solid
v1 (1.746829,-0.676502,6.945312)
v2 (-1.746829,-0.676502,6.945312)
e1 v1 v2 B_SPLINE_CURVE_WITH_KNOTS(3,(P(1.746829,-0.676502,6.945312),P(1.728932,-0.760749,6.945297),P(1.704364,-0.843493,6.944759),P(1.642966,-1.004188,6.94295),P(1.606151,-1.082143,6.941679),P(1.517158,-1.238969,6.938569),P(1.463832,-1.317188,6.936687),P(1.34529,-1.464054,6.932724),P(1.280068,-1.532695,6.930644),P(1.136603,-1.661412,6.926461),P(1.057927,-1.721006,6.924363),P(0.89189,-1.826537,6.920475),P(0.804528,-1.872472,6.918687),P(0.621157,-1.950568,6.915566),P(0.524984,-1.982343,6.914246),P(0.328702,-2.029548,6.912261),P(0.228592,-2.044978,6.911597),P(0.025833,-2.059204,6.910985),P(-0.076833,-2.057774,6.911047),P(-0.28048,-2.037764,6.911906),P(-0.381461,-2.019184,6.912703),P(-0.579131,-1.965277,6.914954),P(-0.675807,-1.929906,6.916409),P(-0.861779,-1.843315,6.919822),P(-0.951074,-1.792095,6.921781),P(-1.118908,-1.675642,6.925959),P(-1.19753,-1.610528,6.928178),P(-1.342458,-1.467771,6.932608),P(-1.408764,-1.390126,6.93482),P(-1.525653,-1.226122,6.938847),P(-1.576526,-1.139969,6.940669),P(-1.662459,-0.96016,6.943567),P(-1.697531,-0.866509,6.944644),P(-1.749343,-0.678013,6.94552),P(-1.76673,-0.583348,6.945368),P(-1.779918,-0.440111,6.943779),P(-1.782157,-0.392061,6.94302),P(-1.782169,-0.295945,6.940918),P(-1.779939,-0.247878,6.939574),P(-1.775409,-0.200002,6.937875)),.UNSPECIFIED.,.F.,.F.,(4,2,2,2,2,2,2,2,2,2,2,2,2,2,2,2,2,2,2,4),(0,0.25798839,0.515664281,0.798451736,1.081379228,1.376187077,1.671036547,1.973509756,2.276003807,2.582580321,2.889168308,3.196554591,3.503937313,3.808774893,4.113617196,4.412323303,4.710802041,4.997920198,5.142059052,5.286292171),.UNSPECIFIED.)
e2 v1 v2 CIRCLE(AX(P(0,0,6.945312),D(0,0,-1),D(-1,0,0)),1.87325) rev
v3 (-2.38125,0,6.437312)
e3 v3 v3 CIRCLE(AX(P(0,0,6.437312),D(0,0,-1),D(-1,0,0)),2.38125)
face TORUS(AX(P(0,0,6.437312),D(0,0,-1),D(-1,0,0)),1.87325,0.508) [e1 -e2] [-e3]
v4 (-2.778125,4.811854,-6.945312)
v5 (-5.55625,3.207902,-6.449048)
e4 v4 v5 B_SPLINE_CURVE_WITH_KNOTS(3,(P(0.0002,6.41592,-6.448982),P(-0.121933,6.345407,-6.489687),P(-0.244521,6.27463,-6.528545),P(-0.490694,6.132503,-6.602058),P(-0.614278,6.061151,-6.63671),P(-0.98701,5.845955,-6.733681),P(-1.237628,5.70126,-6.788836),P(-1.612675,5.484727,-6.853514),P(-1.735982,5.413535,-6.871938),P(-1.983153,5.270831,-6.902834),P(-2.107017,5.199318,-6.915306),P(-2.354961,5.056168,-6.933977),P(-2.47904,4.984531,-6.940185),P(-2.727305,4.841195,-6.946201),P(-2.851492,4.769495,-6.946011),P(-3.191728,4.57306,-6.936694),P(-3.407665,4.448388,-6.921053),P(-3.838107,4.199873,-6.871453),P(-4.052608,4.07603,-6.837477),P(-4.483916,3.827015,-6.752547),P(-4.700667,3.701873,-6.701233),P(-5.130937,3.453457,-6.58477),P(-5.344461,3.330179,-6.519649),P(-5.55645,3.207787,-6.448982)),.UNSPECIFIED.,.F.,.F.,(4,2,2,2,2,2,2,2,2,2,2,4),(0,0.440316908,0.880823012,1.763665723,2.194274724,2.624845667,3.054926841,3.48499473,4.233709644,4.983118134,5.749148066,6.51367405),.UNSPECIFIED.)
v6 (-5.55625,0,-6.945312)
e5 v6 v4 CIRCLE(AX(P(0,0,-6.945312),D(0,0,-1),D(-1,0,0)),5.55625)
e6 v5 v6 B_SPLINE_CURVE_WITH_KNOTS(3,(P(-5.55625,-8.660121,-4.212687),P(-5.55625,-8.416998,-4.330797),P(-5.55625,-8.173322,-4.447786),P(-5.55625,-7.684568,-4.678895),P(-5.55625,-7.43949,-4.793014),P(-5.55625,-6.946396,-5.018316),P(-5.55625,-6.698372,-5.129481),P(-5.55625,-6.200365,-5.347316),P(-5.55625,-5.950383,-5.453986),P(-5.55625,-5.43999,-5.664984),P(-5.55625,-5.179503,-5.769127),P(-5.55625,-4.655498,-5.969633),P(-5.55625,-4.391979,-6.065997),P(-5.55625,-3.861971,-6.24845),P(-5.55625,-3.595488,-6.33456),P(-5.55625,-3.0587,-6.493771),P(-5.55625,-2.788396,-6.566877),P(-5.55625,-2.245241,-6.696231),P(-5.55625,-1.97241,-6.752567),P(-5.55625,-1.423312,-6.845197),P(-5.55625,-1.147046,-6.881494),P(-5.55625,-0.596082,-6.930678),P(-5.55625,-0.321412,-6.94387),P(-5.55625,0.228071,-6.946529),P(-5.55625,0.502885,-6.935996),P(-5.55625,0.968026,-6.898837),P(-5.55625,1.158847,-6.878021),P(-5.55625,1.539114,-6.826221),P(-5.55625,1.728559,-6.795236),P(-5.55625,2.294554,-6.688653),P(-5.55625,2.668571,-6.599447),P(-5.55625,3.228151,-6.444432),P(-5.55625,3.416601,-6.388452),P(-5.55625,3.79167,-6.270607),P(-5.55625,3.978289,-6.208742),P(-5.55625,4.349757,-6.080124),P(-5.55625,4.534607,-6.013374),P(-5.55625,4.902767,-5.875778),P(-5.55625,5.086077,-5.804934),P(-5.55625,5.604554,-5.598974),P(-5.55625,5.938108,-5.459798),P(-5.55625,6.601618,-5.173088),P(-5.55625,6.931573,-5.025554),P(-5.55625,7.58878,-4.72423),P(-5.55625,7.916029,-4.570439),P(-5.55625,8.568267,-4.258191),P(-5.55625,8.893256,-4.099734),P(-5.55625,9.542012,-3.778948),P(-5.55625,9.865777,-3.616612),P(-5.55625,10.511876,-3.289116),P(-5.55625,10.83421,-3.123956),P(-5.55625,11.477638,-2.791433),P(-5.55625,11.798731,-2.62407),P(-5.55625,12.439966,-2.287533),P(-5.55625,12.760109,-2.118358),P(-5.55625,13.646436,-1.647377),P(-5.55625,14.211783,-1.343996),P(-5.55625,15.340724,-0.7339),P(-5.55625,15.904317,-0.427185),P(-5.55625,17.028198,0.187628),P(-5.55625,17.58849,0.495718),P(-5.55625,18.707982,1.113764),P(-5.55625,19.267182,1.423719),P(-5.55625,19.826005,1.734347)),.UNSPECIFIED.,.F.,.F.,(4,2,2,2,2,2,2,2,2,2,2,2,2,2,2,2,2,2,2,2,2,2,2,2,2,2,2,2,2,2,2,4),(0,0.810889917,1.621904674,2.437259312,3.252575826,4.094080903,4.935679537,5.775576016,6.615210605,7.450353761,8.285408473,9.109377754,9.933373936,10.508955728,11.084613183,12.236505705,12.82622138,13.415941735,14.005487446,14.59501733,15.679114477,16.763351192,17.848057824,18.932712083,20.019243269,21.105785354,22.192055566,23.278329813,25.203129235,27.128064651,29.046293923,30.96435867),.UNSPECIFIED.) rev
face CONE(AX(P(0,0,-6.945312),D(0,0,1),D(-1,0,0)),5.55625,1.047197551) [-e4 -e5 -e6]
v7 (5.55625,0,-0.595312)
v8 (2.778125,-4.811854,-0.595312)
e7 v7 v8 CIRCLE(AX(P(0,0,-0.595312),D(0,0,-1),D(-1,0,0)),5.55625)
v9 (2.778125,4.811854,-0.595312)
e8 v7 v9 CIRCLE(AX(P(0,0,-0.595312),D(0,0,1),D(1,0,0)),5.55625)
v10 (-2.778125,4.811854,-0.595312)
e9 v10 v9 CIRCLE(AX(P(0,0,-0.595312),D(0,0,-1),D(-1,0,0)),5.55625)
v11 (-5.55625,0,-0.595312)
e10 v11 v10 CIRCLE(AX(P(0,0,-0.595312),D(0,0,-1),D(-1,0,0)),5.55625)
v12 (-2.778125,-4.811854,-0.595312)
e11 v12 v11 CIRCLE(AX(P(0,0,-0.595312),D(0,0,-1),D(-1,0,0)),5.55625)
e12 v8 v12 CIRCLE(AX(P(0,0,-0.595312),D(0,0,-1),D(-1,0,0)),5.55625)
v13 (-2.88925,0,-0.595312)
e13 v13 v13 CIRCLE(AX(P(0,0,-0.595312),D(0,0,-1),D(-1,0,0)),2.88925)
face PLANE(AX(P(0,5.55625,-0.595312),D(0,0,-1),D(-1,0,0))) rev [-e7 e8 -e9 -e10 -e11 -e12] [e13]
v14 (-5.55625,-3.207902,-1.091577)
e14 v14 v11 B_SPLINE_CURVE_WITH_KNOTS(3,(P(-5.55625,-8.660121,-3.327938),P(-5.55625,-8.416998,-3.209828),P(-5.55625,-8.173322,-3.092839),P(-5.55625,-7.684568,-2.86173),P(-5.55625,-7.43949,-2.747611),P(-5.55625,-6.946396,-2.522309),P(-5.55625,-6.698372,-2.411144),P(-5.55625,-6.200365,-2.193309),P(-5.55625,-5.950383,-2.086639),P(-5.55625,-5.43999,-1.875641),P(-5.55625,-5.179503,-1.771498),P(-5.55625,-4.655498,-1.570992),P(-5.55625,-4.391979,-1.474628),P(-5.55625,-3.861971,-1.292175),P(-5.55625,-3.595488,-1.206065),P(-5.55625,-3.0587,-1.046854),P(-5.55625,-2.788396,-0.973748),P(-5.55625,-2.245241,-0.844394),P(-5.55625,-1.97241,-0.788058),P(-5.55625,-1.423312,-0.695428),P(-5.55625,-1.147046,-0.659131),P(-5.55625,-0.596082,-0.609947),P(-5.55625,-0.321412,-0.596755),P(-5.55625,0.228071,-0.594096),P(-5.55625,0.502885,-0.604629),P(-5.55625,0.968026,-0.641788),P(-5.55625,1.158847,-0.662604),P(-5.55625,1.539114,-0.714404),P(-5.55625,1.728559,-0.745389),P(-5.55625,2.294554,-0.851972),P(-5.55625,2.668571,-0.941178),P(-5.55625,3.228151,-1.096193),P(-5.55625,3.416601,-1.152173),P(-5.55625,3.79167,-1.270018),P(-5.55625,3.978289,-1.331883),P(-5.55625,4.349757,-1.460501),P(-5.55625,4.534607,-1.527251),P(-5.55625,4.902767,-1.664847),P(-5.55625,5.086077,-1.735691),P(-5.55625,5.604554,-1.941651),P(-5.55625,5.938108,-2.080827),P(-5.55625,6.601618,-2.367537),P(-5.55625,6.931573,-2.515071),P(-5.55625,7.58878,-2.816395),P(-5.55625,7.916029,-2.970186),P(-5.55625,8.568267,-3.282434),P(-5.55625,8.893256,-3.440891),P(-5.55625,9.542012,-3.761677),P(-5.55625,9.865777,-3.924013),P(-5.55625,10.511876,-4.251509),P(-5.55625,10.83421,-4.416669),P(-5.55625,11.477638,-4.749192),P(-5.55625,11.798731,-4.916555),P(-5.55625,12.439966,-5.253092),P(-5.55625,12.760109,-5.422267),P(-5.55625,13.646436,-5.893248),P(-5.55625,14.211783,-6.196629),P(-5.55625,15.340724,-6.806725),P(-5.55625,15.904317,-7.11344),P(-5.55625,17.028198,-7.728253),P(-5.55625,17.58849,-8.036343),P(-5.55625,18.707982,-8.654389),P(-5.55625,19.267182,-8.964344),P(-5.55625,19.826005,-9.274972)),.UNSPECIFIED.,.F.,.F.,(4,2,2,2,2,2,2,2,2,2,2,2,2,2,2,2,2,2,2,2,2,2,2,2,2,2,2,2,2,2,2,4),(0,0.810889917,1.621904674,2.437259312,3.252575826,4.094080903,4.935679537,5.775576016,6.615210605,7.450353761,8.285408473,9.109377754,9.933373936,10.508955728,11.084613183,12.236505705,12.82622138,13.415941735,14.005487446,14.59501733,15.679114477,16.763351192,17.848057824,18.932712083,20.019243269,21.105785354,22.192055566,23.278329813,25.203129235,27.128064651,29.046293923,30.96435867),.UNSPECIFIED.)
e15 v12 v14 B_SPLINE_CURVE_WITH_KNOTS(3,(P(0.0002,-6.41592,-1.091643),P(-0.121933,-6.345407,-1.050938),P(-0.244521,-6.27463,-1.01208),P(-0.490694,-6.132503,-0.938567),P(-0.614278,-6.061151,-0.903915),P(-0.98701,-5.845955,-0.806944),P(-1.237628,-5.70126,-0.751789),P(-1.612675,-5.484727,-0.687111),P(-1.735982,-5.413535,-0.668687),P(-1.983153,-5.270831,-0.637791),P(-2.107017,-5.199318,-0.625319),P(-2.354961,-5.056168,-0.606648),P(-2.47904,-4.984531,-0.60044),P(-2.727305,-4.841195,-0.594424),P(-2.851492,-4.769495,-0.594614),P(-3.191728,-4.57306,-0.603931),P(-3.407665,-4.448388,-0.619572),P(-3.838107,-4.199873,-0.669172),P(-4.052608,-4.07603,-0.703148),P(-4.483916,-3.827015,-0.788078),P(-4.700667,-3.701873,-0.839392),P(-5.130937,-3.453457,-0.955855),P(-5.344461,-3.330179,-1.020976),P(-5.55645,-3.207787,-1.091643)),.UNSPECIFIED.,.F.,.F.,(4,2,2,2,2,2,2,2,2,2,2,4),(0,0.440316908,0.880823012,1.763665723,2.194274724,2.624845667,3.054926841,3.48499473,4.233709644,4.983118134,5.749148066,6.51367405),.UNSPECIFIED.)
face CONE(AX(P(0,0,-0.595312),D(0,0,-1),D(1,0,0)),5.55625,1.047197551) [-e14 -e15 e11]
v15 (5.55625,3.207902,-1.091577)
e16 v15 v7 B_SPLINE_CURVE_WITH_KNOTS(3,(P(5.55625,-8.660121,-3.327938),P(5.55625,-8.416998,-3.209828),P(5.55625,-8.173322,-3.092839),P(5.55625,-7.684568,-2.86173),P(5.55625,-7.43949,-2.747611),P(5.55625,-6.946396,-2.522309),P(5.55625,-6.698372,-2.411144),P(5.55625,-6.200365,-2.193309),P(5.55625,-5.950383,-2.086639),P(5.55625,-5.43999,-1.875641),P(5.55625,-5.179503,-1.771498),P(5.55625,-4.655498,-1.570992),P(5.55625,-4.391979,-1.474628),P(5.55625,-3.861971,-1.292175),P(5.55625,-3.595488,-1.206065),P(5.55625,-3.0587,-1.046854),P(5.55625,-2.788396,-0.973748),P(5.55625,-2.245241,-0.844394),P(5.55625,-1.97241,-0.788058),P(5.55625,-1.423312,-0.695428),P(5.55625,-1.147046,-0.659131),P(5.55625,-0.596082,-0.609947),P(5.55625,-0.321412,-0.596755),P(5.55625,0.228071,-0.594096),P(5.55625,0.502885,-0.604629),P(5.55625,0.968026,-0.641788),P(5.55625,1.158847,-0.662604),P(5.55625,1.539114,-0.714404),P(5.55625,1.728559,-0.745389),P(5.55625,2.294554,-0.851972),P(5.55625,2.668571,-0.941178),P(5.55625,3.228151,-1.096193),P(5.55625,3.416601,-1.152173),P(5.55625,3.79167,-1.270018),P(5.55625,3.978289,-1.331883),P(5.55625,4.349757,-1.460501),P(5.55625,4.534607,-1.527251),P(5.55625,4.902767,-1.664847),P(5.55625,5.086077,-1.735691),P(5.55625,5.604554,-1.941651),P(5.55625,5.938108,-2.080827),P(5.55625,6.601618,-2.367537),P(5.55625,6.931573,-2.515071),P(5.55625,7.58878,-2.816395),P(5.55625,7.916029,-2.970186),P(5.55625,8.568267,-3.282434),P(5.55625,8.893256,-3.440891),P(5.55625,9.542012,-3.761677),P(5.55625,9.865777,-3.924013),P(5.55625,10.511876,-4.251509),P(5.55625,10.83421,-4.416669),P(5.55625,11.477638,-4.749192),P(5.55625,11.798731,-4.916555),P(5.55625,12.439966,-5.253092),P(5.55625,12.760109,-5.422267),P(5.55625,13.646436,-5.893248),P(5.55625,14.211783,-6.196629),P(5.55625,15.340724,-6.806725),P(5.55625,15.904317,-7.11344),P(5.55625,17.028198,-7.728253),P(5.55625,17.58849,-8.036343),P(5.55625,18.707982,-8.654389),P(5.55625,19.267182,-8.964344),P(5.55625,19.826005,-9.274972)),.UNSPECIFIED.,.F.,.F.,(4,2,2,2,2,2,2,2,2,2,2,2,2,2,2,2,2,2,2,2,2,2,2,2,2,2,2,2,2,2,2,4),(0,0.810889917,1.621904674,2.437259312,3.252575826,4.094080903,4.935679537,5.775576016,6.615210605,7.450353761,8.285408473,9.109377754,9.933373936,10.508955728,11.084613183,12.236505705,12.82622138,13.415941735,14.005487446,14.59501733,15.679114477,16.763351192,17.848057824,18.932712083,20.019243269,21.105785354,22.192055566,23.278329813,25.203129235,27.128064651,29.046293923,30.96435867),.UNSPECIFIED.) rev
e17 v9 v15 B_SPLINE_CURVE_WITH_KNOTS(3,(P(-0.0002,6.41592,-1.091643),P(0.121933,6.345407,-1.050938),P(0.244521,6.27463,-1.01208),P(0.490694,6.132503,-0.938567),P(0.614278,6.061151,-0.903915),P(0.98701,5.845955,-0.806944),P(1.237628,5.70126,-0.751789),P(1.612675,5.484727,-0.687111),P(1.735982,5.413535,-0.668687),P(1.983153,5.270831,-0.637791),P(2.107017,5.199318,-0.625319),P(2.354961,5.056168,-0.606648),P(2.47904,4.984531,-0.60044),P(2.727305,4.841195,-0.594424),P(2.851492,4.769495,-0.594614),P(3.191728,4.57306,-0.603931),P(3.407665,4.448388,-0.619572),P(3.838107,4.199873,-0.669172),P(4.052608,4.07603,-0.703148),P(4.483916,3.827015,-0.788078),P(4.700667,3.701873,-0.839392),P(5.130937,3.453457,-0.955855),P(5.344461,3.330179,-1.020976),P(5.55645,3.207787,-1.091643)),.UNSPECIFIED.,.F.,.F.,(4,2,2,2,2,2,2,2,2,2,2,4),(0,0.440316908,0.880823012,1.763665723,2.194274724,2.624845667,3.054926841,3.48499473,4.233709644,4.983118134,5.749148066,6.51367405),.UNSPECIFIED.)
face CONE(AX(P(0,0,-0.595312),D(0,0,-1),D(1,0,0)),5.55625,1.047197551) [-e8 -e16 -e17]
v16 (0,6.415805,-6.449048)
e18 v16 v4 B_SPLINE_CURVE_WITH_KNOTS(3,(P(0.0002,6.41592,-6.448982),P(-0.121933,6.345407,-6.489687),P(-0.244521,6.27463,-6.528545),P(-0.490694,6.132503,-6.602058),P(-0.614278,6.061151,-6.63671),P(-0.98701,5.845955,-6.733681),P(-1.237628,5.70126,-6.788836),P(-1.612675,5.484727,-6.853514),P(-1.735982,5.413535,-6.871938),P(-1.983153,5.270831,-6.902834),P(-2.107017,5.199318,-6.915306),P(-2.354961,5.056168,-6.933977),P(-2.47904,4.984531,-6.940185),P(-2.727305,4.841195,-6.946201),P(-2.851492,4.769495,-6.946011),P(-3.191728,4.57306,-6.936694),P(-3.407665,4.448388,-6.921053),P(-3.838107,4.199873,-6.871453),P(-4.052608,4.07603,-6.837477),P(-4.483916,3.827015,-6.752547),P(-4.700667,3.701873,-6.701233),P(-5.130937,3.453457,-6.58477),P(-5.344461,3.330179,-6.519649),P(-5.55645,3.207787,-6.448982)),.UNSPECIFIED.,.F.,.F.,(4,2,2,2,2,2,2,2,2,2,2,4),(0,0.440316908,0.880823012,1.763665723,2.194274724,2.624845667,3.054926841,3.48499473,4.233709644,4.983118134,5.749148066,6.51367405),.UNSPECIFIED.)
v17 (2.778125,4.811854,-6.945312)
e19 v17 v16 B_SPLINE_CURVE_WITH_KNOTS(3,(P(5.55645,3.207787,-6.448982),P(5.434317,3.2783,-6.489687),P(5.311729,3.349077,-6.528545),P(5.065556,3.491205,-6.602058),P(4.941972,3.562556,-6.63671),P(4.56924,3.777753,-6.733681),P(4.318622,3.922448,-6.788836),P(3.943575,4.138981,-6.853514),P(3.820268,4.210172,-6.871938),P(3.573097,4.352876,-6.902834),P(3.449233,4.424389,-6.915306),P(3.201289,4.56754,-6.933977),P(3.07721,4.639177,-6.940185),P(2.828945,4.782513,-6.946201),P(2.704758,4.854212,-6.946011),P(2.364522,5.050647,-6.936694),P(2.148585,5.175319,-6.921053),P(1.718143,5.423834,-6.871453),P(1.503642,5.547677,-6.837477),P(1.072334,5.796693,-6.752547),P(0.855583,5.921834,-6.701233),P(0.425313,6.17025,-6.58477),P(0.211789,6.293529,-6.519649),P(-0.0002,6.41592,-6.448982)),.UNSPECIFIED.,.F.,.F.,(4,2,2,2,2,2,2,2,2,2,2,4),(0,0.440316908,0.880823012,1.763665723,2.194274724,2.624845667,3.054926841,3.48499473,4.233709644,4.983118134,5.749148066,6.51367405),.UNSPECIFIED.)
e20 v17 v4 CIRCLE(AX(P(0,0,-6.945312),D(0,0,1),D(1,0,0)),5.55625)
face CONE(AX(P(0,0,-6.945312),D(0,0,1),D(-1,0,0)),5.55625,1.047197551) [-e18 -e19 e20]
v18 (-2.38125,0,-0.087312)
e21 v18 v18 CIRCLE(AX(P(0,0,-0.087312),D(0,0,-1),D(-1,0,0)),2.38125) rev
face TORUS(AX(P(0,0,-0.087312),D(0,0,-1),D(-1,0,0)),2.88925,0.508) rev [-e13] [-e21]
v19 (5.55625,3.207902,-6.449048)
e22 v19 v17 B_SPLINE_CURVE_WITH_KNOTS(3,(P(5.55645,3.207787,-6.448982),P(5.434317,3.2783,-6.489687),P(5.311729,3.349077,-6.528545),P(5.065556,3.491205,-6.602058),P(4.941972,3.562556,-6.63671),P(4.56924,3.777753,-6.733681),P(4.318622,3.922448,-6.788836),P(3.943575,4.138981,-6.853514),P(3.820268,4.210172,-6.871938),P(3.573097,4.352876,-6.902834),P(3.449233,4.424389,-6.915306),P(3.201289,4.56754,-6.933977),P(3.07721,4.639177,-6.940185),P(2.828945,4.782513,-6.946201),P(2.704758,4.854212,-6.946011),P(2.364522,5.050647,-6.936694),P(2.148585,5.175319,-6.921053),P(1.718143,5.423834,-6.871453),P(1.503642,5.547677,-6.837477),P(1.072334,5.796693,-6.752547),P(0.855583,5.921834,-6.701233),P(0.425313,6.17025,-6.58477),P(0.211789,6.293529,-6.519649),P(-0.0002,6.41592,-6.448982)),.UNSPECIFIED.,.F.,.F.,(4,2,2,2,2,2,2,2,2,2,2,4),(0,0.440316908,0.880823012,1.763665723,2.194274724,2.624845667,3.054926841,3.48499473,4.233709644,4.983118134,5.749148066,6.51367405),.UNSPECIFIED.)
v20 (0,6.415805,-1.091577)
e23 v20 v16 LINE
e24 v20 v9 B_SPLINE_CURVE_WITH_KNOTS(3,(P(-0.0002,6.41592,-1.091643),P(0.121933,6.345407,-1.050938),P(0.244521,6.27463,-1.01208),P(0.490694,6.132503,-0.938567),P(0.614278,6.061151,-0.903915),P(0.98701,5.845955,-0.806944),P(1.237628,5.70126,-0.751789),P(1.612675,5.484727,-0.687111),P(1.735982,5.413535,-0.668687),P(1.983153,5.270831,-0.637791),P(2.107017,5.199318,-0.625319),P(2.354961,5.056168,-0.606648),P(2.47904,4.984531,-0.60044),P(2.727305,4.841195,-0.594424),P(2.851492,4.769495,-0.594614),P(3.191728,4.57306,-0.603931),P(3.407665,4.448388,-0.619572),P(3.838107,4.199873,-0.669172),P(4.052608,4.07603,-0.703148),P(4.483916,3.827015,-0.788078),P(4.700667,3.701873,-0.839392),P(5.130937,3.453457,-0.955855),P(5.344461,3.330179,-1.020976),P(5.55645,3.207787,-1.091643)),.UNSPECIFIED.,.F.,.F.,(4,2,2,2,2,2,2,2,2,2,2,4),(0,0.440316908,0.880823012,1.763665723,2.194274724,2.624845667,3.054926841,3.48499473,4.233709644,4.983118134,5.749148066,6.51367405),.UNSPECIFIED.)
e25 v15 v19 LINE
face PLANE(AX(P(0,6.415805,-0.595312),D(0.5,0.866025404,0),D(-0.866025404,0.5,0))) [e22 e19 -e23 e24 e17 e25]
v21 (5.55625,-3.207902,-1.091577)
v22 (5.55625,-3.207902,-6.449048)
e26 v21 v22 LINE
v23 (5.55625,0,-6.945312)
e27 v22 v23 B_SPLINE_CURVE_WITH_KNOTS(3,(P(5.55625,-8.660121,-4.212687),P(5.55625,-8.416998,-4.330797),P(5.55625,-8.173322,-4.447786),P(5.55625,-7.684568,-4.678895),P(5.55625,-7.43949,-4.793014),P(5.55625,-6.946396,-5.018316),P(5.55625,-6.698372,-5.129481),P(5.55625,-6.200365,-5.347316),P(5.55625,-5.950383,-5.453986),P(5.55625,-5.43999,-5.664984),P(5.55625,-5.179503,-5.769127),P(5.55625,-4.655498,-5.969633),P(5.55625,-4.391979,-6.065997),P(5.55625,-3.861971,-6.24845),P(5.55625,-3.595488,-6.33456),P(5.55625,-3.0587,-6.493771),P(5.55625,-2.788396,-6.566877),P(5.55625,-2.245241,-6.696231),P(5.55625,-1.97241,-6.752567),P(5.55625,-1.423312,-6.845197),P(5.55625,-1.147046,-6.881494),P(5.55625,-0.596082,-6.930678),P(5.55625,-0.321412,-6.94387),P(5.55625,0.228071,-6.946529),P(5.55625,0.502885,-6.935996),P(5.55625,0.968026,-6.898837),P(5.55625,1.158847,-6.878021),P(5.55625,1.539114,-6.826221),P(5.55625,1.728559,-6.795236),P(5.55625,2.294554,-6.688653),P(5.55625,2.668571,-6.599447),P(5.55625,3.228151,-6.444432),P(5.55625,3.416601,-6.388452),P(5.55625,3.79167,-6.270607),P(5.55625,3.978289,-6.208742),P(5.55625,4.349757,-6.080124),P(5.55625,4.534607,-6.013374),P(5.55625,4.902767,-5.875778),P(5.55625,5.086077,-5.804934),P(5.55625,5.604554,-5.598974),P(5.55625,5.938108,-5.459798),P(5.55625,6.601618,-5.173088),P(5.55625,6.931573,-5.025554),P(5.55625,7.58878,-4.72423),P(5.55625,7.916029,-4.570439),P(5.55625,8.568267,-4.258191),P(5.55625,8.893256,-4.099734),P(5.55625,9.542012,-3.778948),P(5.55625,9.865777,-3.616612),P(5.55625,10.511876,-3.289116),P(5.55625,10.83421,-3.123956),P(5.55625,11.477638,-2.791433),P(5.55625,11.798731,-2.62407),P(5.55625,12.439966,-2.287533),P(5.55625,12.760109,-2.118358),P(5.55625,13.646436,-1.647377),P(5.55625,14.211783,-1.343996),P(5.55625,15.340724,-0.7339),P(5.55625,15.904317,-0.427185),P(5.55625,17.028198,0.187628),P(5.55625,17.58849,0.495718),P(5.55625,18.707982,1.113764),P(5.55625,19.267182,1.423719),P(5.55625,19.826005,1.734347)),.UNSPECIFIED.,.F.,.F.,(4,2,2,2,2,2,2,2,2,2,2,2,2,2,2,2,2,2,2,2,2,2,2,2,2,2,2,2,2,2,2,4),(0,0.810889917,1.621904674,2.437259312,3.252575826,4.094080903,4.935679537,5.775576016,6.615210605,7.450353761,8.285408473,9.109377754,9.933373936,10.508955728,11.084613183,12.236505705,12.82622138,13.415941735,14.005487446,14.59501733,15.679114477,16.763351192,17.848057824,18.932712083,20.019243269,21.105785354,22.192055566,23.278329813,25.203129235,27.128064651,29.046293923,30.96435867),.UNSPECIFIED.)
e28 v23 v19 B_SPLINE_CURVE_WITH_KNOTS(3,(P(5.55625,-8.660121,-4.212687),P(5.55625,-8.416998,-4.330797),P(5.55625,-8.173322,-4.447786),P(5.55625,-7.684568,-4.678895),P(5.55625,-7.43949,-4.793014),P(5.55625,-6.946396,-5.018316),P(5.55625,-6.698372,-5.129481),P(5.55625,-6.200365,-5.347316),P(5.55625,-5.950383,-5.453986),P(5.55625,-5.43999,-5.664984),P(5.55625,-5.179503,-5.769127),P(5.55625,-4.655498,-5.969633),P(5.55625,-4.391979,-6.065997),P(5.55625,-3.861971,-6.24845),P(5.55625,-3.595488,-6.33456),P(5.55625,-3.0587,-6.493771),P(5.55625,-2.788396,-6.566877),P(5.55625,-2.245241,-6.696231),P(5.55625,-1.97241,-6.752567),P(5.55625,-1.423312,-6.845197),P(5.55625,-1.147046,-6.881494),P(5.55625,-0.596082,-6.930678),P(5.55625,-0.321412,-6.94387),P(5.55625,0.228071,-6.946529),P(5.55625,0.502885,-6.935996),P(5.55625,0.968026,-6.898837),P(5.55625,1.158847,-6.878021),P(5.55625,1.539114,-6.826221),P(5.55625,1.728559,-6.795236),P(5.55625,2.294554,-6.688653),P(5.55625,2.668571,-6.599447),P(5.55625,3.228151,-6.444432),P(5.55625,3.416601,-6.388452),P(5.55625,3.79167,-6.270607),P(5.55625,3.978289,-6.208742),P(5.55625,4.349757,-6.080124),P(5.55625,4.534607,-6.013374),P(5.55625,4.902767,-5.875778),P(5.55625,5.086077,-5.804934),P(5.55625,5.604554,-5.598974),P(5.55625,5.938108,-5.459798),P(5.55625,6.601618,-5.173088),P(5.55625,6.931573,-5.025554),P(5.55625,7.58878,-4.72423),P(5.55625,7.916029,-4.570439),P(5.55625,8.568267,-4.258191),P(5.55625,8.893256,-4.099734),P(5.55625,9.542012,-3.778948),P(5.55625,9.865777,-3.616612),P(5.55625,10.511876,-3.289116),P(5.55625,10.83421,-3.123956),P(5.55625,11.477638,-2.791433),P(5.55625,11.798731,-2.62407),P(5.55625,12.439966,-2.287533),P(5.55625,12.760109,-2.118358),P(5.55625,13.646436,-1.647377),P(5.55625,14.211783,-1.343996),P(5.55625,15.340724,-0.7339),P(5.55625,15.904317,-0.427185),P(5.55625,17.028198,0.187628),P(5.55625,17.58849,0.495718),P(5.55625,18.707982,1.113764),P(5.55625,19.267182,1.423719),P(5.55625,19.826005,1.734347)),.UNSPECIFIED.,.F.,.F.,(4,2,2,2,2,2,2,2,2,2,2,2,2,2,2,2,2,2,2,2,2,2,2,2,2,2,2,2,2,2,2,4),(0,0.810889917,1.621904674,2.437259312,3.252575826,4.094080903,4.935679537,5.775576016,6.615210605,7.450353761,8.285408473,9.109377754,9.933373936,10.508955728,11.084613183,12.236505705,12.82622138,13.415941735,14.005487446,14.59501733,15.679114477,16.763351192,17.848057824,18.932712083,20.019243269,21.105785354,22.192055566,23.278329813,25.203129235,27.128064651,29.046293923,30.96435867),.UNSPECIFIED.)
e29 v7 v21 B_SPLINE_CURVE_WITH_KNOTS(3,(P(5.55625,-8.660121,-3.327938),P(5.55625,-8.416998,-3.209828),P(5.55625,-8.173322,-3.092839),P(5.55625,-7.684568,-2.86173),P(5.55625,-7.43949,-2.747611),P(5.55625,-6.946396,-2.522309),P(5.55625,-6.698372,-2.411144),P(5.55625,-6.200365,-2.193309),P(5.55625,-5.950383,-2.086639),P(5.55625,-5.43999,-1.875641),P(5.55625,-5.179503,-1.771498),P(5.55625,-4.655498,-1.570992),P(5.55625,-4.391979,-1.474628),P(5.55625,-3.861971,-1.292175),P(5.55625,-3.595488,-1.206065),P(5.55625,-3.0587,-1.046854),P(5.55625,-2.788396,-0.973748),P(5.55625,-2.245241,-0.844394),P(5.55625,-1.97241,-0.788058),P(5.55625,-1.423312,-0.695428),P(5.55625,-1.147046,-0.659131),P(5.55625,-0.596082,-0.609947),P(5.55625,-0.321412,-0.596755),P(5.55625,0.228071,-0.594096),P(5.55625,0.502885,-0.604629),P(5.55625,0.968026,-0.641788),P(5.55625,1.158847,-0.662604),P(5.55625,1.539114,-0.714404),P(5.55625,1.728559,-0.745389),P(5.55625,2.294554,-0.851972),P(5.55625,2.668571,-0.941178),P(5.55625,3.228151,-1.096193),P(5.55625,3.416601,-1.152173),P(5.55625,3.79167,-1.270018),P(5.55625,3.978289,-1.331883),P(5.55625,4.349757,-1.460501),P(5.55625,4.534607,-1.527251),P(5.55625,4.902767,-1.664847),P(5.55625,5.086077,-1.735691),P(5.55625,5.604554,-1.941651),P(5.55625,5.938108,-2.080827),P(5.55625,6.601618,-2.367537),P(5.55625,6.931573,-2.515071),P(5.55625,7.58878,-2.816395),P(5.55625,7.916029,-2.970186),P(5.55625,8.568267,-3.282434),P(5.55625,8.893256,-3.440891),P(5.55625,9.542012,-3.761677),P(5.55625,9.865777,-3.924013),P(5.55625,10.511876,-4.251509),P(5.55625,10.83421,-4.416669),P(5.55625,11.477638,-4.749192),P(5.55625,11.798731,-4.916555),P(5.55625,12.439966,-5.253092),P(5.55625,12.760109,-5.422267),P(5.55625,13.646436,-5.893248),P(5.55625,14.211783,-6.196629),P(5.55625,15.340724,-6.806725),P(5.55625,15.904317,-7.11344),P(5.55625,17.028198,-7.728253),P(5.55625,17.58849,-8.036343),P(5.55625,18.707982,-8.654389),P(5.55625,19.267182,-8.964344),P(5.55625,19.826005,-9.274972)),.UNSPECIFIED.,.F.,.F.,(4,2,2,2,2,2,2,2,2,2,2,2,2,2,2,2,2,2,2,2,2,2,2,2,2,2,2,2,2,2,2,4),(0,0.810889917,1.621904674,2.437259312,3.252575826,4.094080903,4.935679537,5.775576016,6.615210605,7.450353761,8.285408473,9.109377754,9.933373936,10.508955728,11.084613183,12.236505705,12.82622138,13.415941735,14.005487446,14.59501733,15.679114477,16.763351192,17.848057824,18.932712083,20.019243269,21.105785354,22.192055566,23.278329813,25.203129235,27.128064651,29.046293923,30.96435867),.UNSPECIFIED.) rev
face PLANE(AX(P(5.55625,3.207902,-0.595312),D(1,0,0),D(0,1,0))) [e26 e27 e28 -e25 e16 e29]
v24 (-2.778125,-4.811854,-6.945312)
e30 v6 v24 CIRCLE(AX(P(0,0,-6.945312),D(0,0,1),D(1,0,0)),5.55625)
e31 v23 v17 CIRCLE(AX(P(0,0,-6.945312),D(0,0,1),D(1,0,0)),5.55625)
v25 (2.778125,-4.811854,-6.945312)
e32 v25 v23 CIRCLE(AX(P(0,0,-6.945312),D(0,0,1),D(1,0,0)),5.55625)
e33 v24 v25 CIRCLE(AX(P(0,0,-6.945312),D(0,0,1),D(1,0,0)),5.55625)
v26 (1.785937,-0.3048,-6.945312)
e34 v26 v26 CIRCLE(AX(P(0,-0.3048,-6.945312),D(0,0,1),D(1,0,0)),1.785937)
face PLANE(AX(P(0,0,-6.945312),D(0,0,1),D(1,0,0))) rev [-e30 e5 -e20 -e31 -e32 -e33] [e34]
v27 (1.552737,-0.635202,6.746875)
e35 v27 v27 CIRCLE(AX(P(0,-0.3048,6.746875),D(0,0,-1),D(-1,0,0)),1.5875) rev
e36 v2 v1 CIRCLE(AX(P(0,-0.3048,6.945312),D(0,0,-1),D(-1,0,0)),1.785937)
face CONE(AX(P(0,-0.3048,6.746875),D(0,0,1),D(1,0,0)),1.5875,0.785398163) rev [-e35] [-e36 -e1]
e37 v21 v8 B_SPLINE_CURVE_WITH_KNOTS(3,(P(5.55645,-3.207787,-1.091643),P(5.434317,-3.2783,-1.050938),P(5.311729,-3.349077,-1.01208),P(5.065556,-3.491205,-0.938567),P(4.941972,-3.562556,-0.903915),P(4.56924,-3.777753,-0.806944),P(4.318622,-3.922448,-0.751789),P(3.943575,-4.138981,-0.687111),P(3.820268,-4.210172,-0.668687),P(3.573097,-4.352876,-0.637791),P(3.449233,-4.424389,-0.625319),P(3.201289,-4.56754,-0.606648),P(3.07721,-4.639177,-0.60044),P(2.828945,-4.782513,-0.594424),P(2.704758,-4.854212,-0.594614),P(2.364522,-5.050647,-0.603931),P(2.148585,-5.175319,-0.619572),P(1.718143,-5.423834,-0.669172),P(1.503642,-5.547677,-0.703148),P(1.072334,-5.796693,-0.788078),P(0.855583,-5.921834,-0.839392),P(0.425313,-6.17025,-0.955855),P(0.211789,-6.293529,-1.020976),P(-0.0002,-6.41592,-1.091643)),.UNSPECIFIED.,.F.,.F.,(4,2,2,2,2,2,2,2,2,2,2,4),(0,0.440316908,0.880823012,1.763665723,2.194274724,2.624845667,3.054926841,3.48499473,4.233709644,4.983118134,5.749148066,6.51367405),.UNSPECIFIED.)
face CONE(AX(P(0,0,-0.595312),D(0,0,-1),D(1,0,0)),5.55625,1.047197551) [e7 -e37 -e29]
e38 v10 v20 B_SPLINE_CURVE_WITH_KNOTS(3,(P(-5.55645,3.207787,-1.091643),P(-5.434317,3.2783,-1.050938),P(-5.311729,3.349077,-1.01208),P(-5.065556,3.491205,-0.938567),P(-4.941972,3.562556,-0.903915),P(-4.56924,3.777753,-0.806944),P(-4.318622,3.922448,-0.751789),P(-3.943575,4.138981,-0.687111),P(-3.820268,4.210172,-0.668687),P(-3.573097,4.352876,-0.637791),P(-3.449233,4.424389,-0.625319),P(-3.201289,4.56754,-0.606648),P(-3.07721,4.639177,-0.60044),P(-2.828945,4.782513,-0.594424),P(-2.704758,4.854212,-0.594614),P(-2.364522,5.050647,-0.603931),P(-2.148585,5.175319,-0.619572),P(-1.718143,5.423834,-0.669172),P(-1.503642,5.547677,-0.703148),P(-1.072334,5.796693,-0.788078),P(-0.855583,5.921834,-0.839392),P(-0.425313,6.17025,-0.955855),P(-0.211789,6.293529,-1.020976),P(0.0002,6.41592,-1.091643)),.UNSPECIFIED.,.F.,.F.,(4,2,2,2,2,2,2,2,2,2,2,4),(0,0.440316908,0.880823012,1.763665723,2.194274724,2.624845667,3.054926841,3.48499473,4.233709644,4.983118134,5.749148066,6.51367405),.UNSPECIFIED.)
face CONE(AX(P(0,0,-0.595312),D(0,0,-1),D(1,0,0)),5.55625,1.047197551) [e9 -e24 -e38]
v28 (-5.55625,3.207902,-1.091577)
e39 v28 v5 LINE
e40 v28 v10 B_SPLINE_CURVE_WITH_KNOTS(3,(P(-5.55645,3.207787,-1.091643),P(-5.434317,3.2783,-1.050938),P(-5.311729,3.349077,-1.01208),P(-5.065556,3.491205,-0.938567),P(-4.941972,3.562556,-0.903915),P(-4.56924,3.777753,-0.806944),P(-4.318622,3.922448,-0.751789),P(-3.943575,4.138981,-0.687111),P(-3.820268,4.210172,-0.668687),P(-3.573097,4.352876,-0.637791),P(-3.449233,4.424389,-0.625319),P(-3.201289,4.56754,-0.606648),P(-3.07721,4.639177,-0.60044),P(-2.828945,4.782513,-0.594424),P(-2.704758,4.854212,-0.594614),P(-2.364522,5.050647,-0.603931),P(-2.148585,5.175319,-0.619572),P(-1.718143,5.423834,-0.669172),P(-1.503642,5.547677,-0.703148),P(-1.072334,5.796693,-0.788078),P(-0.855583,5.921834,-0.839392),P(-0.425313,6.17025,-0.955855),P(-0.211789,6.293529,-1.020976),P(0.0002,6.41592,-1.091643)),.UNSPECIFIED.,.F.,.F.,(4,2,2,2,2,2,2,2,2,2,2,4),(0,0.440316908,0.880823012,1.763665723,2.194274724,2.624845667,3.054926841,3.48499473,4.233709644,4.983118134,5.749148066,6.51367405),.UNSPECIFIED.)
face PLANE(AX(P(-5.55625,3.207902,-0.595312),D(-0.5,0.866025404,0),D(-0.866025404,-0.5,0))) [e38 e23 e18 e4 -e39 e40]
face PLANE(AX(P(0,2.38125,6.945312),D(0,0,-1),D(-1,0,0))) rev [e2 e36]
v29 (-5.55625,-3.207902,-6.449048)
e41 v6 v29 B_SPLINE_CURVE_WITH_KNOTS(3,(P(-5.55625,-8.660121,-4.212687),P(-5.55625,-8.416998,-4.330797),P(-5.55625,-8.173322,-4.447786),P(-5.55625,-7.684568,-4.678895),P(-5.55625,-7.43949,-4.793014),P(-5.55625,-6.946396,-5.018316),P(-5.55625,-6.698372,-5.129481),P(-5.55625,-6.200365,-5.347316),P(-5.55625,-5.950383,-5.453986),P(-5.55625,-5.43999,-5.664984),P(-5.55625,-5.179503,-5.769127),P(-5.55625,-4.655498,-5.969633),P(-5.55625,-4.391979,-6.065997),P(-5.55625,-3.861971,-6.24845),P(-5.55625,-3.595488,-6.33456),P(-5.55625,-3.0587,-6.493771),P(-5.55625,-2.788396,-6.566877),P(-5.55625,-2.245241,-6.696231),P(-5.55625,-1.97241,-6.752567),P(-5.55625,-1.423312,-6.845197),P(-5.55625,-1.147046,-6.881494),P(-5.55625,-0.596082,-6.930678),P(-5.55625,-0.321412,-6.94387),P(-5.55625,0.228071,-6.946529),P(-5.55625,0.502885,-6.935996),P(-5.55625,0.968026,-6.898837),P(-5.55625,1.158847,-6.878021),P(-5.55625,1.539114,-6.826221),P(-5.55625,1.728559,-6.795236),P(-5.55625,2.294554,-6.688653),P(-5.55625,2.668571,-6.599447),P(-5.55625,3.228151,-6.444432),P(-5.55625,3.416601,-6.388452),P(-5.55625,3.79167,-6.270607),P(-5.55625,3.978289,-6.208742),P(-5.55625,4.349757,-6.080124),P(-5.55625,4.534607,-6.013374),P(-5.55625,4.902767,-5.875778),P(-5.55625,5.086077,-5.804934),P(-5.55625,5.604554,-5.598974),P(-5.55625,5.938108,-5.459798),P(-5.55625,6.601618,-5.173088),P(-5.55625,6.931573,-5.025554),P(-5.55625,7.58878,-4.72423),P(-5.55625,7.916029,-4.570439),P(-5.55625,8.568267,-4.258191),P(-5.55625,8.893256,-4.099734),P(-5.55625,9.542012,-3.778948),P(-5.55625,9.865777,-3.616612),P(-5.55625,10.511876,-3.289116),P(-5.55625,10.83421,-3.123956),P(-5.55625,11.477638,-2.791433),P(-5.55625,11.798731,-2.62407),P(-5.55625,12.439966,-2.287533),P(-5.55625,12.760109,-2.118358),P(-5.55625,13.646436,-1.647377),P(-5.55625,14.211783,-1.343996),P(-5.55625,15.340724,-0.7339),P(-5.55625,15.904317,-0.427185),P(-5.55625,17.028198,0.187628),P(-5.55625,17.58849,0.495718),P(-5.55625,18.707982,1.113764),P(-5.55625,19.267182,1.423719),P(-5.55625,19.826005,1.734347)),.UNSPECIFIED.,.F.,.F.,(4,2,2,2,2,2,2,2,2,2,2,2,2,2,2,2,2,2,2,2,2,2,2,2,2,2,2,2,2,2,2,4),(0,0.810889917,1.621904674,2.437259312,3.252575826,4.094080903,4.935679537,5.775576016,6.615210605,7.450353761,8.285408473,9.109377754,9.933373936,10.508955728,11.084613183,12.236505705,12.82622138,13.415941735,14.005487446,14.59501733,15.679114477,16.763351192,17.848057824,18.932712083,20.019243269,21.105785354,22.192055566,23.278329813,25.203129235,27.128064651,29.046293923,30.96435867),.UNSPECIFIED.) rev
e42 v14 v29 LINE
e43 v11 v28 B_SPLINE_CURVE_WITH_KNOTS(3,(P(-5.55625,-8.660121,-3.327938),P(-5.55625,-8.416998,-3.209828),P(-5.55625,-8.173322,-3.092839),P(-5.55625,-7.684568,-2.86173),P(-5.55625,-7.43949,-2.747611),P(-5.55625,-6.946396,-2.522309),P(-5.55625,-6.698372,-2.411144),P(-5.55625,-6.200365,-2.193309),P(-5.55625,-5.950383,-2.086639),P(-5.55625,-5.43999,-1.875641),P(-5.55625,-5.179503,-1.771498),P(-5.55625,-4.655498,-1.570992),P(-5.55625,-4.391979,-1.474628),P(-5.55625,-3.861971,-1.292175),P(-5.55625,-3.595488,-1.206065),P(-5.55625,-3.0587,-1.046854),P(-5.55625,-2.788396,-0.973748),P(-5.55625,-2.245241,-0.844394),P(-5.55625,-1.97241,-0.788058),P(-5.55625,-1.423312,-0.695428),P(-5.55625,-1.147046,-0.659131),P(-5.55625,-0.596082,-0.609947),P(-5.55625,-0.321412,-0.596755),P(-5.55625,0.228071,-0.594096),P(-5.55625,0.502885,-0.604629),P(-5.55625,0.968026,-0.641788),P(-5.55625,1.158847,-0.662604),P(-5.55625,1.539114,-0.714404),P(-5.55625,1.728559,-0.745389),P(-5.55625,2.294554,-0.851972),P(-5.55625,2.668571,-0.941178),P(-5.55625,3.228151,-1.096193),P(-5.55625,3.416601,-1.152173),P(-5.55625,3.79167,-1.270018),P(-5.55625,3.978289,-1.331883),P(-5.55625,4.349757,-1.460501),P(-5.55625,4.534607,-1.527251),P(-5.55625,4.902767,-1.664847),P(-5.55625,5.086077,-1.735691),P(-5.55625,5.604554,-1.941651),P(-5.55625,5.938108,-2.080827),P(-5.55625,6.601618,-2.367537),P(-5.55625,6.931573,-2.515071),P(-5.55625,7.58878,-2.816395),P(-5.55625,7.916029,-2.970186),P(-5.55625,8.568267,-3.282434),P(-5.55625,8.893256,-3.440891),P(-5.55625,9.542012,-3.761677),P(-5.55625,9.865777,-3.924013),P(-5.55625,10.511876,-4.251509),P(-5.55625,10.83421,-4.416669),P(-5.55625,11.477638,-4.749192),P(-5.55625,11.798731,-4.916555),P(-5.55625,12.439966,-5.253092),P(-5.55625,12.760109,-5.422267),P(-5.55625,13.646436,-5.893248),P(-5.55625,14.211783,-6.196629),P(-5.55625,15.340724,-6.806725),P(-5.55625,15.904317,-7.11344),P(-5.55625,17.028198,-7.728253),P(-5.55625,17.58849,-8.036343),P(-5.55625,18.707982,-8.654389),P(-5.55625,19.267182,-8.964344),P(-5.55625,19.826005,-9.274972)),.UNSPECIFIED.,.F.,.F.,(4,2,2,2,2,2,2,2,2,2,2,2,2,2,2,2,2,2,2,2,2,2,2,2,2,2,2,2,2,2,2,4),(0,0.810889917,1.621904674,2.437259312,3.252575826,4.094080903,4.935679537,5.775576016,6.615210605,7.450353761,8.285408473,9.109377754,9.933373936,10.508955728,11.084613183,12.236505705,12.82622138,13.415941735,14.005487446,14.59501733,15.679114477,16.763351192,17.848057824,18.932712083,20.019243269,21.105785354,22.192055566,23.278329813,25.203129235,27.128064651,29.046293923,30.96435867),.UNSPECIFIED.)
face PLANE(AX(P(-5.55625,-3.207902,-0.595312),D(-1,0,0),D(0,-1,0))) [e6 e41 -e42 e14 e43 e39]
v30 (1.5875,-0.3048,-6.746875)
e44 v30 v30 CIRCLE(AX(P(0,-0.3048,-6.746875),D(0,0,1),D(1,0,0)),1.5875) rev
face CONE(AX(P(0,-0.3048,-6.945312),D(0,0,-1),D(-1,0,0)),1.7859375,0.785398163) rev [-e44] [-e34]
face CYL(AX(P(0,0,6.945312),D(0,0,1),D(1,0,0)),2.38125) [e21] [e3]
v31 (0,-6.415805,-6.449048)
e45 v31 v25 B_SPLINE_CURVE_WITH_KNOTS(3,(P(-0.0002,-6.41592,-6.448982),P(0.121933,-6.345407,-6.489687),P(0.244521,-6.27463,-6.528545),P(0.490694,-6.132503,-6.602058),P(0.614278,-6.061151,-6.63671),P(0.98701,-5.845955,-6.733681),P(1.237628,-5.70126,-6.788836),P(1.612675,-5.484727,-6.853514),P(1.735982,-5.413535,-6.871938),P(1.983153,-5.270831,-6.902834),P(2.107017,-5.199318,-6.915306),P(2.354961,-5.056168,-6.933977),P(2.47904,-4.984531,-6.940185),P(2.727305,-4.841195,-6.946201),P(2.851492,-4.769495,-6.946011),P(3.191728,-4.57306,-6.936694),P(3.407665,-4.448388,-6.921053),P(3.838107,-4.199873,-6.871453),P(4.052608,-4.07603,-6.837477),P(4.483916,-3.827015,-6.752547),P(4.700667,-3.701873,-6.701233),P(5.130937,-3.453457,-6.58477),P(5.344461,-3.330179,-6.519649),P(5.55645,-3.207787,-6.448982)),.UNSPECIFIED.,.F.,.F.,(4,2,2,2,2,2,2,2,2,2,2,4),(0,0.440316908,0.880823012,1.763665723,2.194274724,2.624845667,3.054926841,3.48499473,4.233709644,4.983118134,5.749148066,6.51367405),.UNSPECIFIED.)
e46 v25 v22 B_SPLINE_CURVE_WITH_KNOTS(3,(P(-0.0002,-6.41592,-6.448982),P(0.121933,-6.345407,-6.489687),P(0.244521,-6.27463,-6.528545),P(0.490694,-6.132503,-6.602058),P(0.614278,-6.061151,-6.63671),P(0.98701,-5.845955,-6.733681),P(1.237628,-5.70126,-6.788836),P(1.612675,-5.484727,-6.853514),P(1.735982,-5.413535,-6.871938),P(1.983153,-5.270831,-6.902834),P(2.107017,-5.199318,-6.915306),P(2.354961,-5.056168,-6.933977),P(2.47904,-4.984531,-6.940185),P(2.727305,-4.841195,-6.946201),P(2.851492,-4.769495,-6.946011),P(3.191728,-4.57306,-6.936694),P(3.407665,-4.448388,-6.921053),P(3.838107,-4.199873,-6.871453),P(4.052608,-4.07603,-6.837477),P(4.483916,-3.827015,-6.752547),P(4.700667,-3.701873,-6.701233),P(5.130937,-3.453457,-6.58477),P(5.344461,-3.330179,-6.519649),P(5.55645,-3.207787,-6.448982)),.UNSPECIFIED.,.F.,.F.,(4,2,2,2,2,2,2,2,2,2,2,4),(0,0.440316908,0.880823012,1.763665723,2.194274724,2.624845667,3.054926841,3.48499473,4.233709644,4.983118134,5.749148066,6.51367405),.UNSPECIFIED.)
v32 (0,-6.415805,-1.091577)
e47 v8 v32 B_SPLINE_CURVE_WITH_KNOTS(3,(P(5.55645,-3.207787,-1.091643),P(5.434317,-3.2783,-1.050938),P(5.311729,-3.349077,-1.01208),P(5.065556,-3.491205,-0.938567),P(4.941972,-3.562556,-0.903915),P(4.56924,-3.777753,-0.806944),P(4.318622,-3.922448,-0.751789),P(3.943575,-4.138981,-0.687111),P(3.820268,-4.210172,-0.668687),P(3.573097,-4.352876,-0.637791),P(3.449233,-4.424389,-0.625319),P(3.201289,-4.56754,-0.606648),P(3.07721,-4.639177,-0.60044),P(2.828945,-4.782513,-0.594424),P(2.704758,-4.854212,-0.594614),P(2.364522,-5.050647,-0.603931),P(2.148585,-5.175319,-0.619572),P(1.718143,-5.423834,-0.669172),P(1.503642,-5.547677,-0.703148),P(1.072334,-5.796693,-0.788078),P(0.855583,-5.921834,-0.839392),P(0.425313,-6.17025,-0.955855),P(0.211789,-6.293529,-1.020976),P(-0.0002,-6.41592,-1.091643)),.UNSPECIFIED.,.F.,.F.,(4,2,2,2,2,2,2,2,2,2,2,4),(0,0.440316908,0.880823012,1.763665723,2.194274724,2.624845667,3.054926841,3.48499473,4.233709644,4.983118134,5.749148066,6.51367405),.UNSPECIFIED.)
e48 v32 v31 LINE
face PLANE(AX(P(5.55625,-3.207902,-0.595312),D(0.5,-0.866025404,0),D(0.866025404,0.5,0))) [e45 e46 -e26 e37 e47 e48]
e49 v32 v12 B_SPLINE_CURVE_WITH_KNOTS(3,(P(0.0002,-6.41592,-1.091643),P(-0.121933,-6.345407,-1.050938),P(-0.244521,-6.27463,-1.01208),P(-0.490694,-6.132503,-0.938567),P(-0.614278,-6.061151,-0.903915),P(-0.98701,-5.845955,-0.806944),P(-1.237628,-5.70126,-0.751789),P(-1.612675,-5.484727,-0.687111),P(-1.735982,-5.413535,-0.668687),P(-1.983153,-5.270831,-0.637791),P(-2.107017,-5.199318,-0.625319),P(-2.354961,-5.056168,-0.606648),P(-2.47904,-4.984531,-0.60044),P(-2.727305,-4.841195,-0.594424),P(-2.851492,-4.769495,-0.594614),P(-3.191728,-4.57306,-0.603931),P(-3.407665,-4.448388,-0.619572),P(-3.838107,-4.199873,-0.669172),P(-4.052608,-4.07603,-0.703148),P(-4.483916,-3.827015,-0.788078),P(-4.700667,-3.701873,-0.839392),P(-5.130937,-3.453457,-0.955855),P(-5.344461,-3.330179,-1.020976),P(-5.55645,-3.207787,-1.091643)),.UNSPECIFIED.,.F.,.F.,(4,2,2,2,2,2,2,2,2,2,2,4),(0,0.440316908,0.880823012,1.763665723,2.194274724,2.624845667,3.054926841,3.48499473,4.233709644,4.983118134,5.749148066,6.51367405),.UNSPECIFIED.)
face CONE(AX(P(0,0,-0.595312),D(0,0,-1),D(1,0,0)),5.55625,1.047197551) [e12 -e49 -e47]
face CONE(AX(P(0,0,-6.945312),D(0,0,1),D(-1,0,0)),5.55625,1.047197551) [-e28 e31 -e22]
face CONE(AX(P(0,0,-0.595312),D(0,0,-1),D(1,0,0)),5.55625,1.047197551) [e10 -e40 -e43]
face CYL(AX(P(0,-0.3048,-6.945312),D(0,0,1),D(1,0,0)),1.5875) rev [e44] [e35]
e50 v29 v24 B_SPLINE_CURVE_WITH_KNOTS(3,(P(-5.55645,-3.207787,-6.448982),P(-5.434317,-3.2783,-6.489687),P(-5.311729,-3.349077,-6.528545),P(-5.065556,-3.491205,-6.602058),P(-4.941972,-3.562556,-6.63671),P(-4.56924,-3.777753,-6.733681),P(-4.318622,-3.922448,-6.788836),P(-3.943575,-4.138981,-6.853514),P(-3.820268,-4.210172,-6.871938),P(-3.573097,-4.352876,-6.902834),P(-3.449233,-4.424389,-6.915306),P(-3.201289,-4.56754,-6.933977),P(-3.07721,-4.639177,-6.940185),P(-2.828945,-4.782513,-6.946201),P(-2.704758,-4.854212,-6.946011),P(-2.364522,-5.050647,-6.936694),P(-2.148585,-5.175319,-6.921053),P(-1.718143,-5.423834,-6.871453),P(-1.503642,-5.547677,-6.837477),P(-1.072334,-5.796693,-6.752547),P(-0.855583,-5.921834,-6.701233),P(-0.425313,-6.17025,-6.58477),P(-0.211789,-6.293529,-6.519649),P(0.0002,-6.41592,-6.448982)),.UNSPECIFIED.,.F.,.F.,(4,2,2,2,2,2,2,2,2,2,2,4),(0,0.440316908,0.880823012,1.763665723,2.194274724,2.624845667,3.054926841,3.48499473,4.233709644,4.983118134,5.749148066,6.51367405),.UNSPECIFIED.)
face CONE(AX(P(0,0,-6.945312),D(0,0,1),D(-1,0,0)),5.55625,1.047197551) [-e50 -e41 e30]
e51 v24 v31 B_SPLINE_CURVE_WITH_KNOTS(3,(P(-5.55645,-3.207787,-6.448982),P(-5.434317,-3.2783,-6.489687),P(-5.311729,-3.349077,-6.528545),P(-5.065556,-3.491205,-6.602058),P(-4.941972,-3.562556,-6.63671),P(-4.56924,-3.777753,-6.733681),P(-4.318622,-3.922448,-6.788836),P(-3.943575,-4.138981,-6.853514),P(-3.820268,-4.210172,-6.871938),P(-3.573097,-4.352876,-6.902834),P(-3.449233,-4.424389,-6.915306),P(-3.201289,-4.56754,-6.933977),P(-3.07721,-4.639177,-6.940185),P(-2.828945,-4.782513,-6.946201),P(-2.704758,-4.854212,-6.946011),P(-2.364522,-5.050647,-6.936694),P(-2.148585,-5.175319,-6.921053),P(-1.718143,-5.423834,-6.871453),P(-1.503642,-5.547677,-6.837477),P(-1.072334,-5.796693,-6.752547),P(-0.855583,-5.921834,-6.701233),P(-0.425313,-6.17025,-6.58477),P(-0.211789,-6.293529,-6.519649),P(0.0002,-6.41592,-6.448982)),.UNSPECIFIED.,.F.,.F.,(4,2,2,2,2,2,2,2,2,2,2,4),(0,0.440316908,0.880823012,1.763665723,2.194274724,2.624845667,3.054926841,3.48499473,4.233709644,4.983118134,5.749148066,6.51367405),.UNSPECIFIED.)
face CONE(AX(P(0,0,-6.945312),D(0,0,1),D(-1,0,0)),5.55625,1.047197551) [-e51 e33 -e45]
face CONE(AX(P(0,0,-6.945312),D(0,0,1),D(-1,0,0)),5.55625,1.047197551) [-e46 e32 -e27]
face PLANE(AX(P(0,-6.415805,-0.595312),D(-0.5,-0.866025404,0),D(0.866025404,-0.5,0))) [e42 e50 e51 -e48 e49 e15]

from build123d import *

# Parameters (mm, degrees)
HEX_EXTRUDE_DEPTH        = 6.35
SKETCH4_OUTSIDE_W        = 77.352
SKETCH4_OUTSIDE_H        = 79.072
SKETCH4_OUTSIDE_R        = 5.55625
HEX_CUT1_DEPTH           = 17.278326973
HEX_CUT1_DRAFT           = -60
SKETCH5_OUTSIDE_W        = 60.292
SKETCH5_OUTSIDE_H        = 62.012
SKETCH5_OUTSIDE_R        = 5.55625
HEX_CUT2_DEPTH           = 12.353215031
HEX_CUT2_DRAFT           = -60
SKETCH6_R                = 1.5875
ECCENTRIC_HOLE_CUT_DEPTH = 17.278326973
FILLET_2_R               = 0.508


with BuildPart() as part:
    # Sketch2 → Body Revolve (revolve)
    with BuildSketch(Plane(origin=(0, 0, 0), x_dir=(0, 0, -1), z_dir=(1, 0, 0)), mode=Mode.PRIVATE) as body_revolve_sk:
        Polygon((-6.9453125, 0), (6.9453125, 0), (6.9453125, 5.55625), (0.5953125, 5.55625), (0.5953125, 2.38125), (-6.9453125, 2.38125), align=None)
    revolve(body_revolve_sk.sketch.rotate(Axis((0, 0, 6.9453125), (0, 0, -1)), 90), axis=Axis((0, 0, 6.9453125), (0, 0, -1)))

    # Sketch3 → Hex Extrude (add)
    with BuildSketch(Plane(origin=(0, 0, -6.9453125), x_dir=(-1, 0, 0), z_dir=(0, 0, -1))):
        Polygon((0, 6.415804866), (-5.55625, 3.207902433), (-5.55625, -3.207902433), (0, -6.415804866), (5.55625, -3.207902433), (5.55625, 3.207902433), align=None)
    extrude(amount=-HEX_EXTRUDE_DEPTH)


with BuildPart() as hex_cut1_tool:
    # Sketch4 outside → Hex Cut1 (with draft: the straight prism first)
    with BuildSketch(Plane(origin=(0, 0, -6.9453125), x_dir=(-1, 0, 0), z_dir=(0, 0, -1))):
        Rectangle(SKETCH4_OUTSIDE_W, SKETCH4_OUTSIDE_H)
        Circle(SKETCH4_OUTSIDE_R, mode=Mode.SUBTRACT)
    extrude(amount=-HEX_CUT1_DEPTH)
    # Hex Cut1: the draft: its side faces are tilted about the plane it starts from
    hex_cut1_sides = [hex_cut1_tool.faces().sort_by_distance(p)[0] for p in [
        (0, -39.536, 1.693850986),
        (-38.676, 0, 1.693850986),
        (0, 39.536, 1.693850986),
        (38.676, 0, 1.693850986),
        (5.55625, 0, 1.693850986),
    ]]
    draft(hex_cut1_sides, Plane(origin=(0, 0, -6.9453125), x_dir=(-1, 0, 0), z_dir=(0, 0, -1)), HEX_CUT1_DRAFT)


with BuildPart() as part_1:
    add(part.part)

    # Hex Cut1: cut by hex_cut1_tool
    add(hex_cut1_tool.part, mode=Mode.SUBTRACT)


with BuildPart() as hex_cut2_tool:
    # Sketch5 outside → Hex Cut2 (with draft: the straight prism first)
    with BuildSketch(Plane.XY.offset(-0.5953125)):
        Rectangle(SKETCH5_OUTSIDE_W, SKETCH5_OUTSIDE_H)
        Circle(SKETCH5_OUTSIDE_R, mode=Mode.SUBTRACT)
    extrude(amount=-HEX_CUT2_DEPTH)
    # Hex Cut2: the draft: its side faces are tilted about the plane it starts from
    hex_cut2_sides = [hex_cut2_tool.faces().sort_by_distance(p)[0] for p in [
        (0, -31.006, -6.771920015),
        (30.146, 0, -6.771920015),
        (0, 31.006, -6.771920015),
        (-30.146, 0, -6.771920015),
        (-5.55625, 0, -6.771920015),
    ]]
    draft(hex_cut2_sides, Plane.XY.offset(-0.5953125), HEX_CUT2_DRAFT)


with BuildPart() as part_2:
    add(part_1.part)

    # Hex Cut2: cut by hex_cut2_tool
    add(hex_cut2_tool.part, mode=Mode.SUBTRACT)

    # Sketch6 → Eccentric Hole Cut (cut, through all)
    with BuildSketch(Plane.XY.offset(6.9453125)):
        with Locations((0, -0.3048)):
            Circle(SKETCH6_R)
    extrude(amount=-ECCENTRIC_HOLE_CUT_DEPTH, mode=Mode.SUBTRACT)

    # Fillet 2
    fillet_2_edges = [part_2.edges().sort_by_distance(p)[0] for p in [
        (-2.38125, 0, 6.9453125),
        (-2.38125, 0, -0.5953125),
    ]]
    fillet(fillet_2_edges, radius=FILLET_2_R)

    # Chamfer 2: read off the stored shape, not the designer's step
    # Chamfer 2 outline → Chamfer 2 (revolve, cut)
    with BuildSketch(Plane.XZ.offset(0.3048)):
        Polygon((1.5875, 6.945313993), (1.5875, 6.746875), (1.785938993, 6.945313993), align=None)
        Polygon((1.7859375, -6.9453125), (1.5875, -6.746875), (1.5875, -6.9453125), align=None)
    revolve(axis=Axis((0, -0.3048, 0), (0, 0, 1)), mode=Mode.SUBTRACT)


solid = part_2.part
